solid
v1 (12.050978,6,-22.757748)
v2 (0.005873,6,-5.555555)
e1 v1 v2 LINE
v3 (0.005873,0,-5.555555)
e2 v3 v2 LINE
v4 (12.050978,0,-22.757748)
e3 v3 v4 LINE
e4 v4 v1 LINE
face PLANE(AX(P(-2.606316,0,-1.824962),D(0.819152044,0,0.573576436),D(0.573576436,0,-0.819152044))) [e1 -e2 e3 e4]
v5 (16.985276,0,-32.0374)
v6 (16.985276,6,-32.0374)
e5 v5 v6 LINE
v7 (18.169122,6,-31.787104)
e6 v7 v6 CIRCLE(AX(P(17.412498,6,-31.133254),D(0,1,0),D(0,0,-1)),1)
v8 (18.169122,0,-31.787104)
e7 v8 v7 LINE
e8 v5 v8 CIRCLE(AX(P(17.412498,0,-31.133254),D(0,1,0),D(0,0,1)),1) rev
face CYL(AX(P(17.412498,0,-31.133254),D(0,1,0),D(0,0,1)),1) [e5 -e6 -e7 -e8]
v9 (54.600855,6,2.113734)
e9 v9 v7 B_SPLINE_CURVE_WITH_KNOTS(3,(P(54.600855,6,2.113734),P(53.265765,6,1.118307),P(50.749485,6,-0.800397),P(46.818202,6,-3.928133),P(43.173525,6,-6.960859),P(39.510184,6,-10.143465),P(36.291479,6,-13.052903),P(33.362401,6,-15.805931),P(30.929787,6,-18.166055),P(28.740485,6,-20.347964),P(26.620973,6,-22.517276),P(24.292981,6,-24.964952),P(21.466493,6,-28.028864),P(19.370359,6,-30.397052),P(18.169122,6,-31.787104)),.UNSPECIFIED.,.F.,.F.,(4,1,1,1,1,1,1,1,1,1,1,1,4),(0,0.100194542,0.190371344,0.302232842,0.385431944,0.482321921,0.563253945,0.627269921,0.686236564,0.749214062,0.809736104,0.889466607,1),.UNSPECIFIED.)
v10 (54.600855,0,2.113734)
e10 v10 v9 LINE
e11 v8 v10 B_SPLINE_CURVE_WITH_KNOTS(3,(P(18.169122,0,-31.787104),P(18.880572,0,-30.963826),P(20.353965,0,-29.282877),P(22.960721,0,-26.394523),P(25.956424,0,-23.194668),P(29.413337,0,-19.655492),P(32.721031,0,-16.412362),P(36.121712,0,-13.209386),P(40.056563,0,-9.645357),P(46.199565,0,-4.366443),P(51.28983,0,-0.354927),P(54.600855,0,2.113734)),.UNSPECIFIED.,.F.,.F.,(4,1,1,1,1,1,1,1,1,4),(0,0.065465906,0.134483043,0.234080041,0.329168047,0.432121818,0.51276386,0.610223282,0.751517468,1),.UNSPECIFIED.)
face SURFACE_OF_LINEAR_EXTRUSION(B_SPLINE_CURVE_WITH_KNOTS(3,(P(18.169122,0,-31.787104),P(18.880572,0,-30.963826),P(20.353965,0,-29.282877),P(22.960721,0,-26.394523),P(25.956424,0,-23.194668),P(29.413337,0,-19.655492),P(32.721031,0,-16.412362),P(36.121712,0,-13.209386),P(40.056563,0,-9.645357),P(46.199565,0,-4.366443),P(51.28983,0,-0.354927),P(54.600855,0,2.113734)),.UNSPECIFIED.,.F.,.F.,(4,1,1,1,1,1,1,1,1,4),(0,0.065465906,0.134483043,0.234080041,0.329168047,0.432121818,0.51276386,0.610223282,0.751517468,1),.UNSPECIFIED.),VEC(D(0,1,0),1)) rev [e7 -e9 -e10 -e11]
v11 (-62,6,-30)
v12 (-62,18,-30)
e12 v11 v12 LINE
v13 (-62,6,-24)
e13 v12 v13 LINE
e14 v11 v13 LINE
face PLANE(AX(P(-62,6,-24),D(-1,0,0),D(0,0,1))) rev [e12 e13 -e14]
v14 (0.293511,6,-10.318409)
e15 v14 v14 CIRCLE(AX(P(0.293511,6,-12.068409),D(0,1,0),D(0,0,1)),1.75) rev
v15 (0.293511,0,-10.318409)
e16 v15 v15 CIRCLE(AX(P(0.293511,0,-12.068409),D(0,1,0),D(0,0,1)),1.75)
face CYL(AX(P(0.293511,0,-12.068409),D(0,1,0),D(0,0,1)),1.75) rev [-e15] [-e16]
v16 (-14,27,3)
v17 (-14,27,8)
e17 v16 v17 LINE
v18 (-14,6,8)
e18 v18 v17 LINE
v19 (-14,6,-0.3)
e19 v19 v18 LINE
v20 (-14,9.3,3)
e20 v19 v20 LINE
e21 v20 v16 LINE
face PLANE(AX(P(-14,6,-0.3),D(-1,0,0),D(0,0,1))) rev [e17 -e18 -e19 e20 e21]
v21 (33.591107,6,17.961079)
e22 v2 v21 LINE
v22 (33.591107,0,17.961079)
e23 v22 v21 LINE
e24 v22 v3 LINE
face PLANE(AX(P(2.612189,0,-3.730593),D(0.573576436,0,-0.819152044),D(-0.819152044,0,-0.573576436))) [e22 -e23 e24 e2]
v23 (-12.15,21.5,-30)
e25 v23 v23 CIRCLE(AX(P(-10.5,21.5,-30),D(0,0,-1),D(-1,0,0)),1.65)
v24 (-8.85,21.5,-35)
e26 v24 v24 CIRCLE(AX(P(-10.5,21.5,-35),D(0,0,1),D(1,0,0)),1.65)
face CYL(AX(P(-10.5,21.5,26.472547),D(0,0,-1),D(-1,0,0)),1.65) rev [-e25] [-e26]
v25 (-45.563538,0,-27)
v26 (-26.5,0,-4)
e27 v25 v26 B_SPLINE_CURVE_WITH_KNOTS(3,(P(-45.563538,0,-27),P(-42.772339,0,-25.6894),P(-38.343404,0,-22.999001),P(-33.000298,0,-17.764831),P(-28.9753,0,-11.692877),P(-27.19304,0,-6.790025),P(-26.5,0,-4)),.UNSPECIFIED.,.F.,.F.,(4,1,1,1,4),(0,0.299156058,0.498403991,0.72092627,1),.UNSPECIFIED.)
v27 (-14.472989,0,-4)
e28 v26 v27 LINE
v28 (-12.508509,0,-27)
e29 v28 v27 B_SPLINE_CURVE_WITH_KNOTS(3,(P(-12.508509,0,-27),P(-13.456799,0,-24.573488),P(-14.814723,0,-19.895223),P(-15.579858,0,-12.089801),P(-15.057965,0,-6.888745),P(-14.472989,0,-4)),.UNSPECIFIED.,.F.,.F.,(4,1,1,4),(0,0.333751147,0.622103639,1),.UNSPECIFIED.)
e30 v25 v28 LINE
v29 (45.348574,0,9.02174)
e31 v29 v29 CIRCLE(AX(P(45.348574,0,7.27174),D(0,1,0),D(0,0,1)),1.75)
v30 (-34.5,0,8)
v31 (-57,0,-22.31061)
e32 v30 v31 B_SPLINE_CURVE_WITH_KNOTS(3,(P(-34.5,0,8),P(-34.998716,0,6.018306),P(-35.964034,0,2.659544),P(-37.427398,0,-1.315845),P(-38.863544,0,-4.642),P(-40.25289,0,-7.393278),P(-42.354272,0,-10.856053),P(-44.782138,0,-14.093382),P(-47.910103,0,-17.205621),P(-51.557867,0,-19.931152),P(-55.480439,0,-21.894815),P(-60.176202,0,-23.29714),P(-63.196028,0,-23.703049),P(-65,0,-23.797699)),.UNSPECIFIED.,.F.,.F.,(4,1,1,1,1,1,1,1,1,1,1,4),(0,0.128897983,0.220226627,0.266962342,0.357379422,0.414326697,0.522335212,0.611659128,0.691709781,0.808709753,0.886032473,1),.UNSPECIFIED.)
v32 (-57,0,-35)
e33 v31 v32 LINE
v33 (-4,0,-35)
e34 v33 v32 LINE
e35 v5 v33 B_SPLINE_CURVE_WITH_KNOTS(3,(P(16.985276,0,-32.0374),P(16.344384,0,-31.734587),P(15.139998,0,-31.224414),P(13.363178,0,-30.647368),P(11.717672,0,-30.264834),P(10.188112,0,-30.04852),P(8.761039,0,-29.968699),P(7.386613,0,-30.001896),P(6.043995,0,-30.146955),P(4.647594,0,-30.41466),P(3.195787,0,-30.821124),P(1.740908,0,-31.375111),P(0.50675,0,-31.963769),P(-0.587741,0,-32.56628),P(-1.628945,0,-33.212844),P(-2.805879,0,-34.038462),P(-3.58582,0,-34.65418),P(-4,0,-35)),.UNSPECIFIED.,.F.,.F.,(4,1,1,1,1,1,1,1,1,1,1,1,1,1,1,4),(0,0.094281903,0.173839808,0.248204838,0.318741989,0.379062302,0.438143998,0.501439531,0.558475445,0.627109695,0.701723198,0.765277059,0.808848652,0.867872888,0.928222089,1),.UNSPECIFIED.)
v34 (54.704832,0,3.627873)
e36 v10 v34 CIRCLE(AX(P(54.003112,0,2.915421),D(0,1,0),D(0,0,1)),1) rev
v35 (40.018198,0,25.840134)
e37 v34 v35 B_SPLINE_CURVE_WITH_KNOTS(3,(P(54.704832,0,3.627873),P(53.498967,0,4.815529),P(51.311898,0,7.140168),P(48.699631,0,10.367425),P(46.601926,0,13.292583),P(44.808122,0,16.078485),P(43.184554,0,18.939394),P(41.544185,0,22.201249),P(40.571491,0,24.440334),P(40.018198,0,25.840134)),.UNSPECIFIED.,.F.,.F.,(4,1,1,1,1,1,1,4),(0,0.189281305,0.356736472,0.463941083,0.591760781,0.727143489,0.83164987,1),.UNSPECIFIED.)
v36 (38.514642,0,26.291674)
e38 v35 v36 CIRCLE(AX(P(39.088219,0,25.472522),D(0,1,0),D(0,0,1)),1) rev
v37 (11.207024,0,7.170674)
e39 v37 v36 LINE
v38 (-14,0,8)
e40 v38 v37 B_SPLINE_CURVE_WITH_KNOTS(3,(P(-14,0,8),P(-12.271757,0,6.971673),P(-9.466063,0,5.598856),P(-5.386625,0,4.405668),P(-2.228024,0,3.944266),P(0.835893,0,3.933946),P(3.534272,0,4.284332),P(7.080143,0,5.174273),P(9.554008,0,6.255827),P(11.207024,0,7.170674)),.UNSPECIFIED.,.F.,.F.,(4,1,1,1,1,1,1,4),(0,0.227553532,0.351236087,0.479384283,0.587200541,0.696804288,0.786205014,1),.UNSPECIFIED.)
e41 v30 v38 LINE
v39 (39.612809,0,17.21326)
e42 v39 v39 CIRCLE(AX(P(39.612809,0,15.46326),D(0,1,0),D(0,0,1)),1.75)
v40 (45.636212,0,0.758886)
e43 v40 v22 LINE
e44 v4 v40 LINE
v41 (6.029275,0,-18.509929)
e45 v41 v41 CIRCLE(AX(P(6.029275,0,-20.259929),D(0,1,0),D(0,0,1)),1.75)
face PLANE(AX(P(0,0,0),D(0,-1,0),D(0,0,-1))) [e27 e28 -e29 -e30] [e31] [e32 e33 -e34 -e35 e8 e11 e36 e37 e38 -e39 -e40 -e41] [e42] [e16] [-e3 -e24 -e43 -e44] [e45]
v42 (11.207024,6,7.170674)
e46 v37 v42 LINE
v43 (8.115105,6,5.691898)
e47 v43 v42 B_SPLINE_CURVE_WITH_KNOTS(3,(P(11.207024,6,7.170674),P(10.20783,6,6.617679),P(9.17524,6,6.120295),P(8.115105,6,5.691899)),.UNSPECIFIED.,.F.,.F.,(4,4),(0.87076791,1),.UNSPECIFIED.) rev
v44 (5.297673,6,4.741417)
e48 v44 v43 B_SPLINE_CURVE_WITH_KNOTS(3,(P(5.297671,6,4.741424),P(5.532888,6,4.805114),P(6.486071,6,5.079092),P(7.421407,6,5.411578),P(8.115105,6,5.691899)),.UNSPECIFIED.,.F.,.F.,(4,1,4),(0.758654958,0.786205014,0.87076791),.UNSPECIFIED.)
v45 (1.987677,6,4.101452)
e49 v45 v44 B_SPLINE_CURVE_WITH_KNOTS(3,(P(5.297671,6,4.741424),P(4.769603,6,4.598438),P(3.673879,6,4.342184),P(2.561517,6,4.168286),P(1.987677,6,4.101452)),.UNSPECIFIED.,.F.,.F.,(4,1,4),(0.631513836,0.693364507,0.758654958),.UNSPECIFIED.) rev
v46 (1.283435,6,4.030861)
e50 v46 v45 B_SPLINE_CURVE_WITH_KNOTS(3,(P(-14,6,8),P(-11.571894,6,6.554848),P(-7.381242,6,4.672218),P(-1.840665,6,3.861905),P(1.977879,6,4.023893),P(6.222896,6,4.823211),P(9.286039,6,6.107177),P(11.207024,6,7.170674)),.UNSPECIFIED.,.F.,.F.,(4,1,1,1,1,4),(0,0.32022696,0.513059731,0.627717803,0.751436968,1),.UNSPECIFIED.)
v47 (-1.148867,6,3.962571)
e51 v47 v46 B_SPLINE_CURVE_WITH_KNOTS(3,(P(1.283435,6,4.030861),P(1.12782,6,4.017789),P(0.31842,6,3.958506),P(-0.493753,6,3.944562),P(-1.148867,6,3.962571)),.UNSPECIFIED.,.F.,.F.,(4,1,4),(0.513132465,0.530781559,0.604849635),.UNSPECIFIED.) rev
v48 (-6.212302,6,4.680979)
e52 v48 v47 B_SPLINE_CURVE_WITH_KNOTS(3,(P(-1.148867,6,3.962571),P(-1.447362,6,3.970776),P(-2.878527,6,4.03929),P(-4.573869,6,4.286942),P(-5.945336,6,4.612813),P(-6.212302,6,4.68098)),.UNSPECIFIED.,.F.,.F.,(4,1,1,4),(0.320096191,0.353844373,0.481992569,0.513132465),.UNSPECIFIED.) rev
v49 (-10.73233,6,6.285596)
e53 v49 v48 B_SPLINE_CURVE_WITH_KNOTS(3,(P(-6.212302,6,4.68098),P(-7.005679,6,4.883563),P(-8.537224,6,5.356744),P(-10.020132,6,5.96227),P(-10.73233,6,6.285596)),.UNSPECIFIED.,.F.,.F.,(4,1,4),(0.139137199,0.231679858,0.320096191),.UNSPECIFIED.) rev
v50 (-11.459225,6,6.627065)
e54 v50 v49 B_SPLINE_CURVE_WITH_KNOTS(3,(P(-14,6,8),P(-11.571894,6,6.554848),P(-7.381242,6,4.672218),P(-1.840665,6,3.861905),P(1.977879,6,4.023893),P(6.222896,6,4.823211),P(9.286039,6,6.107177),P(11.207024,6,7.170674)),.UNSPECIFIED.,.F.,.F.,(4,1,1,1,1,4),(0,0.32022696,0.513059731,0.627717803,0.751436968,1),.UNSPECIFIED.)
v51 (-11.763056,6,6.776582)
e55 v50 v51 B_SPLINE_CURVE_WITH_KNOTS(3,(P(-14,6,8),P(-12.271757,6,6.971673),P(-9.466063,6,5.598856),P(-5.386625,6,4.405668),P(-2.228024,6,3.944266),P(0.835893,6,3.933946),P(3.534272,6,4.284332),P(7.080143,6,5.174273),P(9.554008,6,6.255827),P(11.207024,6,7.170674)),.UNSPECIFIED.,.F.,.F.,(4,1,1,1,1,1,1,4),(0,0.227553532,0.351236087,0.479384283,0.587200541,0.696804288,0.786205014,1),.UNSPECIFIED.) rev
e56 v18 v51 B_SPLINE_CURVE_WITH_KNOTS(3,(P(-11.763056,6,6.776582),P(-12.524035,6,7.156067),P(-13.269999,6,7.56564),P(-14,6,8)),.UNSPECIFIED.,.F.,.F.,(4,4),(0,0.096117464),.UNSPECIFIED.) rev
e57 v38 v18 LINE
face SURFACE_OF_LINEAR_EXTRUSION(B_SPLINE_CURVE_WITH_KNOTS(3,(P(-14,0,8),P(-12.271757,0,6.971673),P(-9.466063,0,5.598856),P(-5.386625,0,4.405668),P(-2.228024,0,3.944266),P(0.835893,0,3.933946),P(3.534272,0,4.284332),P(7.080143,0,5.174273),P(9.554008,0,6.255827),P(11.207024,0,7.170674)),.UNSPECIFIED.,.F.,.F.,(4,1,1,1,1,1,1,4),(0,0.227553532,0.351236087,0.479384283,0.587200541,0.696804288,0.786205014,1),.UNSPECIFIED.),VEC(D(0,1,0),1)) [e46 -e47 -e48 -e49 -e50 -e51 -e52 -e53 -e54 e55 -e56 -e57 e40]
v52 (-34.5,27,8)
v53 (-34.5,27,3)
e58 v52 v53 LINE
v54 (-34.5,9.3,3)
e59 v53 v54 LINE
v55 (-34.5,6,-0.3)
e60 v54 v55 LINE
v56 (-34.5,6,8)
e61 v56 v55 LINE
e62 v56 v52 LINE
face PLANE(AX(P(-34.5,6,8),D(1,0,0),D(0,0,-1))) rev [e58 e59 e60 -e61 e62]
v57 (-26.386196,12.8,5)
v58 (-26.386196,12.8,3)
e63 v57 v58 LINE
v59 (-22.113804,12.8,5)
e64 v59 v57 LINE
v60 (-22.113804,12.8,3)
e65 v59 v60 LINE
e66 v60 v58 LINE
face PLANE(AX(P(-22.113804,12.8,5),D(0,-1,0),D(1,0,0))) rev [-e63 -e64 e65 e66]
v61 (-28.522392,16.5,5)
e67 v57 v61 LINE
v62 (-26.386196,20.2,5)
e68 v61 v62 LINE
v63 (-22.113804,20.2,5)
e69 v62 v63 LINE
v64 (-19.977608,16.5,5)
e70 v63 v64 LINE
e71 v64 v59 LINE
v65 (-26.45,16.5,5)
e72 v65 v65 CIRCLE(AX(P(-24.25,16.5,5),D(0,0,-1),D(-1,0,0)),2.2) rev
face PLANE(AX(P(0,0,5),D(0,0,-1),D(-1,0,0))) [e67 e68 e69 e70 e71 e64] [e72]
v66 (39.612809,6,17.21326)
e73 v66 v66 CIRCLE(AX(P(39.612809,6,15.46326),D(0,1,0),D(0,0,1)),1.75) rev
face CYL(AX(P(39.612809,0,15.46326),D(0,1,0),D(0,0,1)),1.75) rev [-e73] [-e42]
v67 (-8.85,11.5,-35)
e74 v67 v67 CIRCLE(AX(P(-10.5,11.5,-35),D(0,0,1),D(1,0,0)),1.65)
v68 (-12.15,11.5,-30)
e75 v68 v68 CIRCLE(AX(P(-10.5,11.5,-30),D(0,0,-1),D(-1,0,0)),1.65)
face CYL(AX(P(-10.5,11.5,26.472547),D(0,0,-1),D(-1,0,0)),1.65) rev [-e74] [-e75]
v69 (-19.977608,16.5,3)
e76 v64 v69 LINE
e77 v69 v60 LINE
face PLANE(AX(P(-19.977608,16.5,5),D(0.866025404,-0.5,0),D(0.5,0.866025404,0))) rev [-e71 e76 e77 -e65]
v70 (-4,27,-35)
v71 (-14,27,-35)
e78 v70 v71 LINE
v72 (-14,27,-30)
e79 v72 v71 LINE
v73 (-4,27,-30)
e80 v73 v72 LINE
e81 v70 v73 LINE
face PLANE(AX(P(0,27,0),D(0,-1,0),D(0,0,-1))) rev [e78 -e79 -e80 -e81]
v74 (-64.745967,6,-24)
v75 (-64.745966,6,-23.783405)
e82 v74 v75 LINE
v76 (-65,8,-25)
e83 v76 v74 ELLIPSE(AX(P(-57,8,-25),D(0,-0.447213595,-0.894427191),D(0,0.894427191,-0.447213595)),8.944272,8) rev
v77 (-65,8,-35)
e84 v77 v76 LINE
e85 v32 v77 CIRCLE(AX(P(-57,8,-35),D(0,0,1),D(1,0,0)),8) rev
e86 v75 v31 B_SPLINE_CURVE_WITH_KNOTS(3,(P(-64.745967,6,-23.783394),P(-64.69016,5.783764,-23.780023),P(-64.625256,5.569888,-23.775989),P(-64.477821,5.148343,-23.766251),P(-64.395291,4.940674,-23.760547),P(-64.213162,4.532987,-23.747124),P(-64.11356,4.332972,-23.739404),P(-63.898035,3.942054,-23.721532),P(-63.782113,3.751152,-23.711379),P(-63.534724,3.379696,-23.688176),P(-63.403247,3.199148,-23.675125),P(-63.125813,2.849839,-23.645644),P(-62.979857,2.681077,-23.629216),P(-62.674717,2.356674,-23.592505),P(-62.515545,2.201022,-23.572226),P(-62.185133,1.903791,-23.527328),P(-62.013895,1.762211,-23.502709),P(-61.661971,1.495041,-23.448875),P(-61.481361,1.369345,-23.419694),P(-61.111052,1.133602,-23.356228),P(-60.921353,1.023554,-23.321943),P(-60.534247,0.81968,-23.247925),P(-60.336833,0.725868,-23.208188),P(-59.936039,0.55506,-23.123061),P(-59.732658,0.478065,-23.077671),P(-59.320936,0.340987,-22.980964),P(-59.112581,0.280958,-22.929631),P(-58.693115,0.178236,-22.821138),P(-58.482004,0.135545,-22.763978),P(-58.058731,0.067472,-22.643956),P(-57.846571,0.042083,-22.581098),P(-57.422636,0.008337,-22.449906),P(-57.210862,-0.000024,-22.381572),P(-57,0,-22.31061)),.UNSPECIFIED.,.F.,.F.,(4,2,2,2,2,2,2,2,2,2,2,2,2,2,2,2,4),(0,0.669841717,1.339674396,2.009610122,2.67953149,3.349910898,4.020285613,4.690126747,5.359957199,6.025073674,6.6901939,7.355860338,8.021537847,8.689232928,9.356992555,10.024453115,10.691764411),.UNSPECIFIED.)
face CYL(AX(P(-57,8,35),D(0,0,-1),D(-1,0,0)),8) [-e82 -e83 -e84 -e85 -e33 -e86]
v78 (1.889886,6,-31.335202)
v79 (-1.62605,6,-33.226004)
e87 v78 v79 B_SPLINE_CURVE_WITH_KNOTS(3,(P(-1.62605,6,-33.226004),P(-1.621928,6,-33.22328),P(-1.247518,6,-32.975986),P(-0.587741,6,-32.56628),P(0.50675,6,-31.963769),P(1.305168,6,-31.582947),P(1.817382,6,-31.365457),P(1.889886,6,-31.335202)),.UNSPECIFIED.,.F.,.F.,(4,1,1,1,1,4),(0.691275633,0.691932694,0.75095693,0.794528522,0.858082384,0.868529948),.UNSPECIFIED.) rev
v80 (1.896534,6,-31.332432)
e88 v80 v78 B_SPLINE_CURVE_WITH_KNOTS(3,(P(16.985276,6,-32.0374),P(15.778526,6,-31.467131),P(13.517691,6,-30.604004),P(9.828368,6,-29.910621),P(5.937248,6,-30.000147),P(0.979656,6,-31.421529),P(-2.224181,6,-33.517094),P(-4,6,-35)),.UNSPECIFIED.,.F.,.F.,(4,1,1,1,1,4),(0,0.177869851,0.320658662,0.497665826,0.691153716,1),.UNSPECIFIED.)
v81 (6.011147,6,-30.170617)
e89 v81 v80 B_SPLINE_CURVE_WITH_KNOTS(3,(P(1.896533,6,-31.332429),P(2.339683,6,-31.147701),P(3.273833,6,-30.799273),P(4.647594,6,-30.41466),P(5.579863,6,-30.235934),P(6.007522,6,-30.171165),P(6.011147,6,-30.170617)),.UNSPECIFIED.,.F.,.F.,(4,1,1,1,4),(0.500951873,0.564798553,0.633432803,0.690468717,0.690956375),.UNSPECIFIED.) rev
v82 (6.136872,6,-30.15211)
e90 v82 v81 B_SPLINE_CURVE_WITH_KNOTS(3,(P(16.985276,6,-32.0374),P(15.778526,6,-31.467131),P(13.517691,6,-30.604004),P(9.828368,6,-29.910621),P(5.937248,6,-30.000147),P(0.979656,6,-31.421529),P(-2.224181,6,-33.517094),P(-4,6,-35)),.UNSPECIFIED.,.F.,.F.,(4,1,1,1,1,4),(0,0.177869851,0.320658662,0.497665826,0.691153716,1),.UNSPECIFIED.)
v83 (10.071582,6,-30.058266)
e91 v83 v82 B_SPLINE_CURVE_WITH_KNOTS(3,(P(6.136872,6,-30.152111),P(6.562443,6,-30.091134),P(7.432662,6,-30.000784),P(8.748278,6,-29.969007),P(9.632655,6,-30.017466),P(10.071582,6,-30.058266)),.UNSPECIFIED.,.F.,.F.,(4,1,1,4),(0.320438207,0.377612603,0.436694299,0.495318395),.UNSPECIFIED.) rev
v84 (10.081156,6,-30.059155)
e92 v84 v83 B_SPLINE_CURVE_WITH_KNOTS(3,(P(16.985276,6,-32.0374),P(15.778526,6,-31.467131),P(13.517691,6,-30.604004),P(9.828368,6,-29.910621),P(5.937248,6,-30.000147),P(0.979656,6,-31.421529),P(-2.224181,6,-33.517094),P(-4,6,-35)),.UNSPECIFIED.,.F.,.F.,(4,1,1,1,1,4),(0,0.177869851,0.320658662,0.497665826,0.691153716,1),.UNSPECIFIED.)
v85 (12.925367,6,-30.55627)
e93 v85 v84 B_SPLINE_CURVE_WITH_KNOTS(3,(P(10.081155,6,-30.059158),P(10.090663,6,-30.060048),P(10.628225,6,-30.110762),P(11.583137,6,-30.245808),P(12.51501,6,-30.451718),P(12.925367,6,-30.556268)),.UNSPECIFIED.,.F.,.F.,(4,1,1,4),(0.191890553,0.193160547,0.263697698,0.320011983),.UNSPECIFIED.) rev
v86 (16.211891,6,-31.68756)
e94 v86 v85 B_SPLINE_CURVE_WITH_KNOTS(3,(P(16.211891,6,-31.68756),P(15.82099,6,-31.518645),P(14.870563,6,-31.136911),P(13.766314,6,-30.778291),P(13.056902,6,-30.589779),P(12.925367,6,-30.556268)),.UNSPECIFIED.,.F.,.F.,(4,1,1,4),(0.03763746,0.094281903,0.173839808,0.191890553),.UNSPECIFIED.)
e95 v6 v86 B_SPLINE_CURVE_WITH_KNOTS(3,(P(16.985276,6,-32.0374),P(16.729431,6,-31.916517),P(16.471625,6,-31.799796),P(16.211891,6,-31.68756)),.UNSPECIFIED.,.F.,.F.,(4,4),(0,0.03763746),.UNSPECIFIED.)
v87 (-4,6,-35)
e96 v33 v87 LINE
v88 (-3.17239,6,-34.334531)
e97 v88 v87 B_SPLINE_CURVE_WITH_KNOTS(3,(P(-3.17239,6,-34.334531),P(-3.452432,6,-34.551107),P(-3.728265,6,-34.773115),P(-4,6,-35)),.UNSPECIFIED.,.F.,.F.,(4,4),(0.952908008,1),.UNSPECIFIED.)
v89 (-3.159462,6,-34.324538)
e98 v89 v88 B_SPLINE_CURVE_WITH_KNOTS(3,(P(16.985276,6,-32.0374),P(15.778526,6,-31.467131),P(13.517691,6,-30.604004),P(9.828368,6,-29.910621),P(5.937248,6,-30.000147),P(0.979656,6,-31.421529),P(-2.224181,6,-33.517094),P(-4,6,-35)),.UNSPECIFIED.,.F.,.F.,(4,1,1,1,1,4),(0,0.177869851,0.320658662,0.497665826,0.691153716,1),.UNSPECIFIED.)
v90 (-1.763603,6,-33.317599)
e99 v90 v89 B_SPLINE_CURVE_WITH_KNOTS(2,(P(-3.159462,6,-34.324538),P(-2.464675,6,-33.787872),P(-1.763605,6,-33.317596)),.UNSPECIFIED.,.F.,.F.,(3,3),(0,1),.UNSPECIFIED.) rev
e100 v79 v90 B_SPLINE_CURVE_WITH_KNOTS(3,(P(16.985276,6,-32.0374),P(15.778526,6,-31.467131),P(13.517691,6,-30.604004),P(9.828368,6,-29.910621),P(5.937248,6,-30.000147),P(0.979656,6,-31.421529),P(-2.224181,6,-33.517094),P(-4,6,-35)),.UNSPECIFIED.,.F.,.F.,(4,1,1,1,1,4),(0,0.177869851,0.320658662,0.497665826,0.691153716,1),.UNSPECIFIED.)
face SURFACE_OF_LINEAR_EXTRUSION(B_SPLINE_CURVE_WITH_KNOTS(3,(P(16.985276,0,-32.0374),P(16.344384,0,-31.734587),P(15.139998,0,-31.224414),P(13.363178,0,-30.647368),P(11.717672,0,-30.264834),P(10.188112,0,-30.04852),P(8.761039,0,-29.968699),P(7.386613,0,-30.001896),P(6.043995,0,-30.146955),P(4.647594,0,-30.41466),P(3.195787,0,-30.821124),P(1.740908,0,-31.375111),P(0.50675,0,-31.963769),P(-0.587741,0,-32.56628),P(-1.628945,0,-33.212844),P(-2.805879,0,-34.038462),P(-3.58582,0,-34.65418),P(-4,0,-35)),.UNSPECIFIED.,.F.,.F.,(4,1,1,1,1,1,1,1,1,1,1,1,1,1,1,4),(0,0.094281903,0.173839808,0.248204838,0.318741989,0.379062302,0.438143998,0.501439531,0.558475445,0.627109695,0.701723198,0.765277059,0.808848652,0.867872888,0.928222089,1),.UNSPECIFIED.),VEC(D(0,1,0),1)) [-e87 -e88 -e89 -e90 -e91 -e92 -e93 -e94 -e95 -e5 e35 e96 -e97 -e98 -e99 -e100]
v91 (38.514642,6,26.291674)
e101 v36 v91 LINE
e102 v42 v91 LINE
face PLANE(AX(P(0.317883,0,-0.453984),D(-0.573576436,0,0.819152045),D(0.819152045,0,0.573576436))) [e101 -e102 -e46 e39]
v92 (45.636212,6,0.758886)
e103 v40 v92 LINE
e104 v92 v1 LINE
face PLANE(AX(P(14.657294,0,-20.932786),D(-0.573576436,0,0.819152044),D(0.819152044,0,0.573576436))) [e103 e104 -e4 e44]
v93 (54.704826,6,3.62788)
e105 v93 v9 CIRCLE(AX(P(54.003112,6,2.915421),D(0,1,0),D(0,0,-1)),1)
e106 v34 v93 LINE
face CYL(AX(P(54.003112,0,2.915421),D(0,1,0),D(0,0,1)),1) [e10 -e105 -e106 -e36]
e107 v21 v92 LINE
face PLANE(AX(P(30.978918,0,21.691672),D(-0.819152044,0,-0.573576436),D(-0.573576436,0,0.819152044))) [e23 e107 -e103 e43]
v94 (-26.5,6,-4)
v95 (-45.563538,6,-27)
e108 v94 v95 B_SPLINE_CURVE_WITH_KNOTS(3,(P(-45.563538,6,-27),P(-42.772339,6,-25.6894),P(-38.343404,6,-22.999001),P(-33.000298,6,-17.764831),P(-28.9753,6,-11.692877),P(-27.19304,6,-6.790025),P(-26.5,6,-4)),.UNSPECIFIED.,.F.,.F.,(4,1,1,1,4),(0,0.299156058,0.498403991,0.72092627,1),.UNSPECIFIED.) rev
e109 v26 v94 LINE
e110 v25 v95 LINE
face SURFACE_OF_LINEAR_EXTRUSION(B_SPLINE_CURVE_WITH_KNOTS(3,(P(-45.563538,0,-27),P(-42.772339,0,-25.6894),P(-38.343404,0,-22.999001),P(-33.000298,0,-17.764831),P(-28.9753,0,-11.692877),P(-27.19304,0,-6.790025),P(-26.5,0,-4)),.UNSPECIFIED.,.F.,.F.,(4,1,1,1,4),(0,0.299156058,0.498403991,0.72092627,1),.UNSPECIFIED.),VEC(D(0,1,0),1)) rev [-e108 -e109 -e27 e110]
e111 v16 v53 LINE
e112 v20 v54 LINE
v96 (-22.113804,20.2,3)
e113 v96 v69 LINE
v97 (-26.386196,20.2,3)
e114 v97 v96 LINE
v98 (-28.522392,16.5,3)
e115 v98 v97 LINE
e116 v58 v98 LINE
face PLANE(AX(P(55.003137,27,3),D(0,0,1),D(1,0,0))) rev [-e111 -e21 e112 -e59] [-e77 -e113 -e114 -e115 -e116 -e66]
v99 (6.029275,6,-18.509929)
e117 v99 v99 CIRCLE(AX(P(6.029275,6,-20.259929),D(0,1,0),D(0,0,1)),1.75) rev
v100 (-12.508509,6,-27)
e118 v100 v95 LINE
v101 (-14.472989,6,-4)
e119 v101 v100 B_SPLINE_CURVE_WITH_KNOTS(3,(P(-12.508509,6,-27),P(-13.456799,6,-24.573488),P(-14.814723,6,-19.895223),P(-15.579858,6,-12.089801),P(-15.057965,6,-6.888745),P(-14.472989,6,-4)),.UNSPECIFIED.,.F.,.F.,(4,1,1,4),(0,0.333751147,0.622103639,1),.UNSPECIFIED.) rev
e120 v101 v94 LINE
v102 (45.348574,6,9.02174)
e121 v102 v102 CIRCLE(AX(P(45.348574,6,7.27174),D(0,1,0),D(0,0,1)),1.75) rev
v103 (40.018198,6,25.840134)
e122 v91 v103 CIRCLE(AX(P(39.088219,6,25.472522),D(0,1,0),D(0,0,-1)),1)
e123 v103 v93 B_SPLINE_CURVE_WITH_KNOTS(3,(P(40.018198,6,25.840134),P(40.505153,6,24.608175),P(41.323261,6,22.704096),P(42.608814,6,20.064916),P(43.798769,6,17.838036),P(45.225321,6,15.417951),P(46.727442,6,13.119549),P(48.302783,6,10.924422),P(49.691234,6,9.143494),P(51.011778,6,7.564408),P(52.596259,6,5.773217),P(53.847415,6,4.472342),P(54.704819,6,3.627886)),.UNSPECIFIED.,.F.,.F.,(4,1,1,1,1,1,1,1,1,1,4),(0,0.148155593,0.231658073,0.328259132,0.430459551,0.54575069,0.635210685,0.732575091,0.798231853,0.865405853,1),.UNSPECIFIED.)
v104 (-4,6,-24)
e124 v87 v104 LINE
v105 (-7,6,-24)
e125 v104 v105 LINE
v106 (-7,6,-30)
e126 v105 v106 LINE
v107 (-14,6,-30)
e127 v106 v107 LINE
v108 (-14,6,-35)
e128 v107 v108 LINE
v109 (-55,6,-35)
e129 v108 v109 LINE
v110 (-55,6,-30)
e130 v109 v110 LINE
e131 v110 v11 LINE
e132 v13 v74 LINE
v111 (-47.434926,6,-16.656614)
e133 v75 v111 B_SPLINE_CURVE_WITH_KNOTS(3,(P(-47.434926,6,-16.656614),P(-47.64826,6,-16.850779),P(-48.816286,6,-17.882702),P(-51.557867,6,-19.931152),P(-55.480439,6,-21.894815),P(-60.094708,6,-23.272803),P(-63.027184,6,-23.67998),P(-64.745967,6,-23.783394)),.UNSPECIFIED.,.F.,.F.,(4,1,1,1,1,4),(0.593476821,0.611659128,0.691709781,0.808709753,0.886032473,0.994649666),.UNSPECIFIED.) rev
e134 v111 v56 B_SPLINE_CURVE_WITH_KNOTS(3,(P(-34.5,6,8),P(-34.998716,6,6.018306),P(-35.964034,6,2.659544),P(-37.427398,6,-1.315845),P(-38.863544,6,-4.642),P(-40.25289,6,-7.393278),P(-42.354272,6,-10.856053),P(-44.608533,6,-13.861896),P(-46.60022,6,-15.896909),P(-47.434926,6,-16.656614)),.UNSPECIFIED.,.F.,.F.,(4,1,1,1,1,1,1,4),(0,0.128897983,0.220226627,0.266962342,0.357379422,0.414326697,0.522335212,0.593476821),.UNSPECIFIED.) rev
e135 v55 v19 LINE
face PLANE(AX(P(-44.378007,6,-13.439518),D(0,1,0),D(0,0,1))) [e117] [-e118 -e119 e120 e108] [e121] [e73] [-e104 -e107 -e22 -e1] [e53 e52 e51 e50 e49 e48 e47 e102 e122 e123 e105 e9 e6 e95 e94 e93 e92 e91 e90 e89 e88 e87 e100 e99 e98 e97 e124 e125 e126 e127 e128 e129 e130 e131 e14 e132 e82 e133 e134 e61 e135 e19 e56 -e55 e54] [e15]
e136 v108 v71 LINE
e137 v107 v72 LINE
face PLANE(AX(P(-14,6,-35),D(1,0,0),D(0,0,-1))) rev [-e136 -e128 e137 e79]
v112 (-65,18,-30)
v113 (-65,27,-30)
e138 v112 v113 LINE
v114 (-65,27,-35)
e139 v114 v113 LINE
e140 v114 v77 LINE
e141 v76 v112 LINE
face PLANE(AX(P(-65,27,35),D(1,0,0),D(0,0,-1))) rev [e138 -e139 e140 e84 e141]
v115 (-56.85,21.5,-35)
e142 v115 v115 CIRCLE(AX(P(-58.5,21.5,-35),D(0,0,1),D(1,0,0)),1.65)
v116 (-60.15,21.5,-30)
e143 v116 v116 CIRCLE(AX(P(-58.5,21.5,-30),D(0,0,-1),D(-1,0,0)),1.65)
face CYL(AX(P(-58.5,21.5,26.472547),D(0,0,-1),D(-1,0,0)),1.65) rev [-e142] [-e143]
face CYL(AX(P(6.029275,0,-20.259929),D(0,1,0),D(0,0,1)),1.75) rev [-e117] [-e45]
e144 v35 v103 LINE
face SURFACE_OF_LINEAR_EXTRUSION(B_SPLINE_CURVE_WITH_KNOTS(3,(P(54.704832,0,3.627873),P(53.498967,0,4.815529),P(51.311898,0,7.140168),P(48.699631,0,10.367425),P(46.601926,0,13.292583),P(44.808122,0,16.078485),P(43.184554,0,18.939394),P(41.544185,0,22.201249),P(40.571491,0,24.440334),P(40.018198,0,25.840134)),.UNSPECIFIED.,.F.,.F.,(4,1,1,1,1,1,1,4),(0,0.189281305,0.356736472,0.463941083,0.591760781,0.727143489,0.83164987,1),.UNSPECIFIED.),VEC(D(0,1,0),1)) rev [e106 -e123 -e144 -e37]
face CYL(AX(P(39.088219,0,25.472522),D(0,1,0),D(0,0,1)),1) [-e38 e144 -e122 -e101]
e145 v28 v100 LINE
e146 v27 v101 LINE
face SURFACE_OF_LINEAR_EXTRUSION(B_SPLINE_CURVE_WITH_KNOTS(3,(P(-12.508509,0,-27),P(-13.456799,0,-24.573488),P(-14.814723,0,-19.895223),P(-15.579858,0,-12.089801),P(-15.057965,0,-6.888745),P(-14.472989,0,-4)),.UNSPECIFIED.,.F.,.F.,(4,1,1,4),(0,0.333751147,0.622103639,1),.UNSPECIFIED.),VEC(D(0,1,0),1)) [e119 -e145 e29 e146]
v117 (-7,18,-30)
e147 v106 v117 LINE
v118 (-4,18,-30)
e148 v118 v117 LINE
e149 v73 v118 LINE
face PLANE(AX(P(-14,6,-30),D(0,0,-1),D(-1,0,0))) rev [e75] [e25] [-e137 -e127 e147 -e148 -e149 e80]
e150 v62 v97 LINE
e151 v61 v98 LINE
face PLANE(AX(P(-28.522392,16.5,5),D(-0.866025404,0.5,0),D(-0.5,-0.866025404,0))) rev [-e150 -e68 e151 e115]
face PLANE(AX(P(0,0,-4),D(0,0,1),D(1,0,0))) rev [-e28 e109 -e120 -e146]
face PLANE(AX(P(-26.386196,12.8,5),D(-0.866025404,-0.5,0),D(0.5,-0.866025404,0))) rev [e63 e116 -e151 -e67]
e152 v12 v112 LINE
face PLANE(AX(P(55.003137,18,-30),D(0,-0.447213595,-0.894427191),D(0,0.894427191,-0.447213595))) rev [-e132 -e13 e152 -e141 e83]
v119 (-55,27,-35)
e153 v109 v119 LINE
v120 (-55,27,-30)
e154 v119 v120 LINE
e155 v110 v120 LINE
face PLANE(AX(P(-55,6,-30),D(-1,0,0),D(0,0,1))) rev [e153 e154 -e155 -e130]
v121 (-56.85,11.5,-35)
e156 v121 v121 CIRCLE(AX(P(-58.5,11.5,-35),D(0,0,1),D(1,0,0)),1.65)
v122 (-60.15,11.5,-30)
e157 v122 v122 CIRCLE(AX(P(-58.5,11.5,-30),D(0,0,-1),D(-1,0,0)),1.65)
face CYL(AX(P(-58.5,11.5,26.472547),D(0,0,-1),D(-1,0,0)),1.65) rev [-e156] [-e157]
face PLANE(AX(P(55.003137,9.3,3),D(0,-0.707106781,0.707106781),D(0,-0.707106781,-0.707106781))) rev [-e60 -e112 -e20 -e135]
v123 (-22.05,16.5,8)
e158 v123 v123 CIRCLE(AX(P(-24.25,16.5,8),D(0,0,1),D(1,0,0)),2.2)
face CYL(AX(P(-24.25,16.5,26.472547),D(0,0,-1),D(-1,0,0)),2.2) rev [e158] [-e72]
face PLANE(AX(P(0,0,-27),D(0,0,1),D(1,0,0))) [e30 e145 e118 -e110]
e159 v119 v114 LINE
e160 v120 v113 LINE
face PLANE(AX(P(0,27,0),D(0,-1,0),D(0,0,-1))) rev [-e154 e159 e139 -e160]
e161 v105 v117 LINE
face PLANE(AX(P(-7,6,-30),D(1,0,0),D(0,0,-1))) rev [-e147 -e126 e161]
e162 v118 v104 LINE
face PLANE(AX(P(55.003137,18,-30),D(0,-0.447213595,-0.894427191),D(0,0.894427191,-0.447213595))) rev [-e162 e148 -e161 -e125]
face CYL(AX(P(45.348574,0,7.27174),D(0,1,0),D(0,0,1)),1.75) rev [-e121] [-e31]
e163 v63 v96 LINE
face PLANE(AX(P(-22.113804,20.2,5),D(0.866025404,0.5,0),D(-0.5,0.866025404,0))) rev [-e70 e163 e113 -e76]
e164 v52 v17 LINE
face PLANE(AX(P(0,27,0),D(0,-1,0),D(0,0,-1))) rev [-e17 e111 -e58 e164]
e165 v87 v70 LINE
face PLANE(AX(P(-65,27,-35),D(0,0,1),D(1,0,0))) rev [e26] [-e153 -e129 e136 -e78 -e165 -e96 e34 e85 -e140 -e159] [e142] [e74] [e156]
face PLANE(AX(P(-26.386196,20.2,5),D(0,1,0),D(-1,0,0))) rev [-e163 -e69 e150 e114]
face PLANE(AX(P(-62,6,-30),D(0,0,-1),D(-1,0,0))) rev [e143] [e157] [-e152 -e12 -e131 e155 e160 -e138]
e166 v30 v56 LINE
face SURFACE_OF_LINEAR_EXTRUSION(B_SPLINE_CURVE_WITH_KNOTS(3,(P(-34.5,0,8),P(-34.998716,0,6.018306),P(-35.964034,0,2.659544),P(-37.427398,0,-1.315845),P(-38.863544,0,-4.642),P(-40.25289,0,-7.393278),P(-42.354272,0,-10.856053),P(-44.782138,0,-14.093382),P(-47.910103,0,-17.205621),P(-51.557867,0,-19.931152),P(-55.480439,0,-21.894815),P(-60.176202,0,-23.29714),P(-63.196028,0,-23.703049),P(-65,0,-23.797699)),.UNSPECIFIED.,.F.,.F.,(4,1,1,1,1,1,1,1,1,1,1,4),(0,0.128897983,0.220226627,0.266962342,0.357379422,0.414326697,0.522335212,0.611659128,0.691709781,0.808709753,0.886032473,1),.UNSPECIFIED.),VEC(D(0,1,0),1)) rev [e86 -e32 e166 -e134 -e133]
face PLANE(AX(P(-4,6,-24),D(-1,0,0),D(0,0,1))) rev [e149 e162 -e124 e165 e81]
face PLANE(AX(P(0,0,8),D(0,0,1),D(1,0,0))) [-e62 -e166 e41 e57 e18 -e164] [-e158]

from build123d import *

# Parameters (mm, degrees)
SKETCH1_W               = 130
SKETCH1_H               = 70
BOSS_EXTRUDE1_DEPTH     = 27
SKETCH2_R               = 1.75
CUT_EXTRUDE1_DEPTH      = 27
CUT_EXTRUDE2_START      = -21
CUT_EXTRUDE2_OUTLINE_R  = 1.75
CUT_EXTRUDE2_DEPTH      = 21
CUT_EXTRUDE3_DEPTH      = 100.823879977
CUT_EXTRUDE3_DEPTH_BACK = 100.823879977
CUT_EXTRUDE4_DEPTH      = 80.987499152
CUT_EXTRUDE4_DEPTH_BACK = 80.987499152
SKETCH5_R               = 1.65
SKETCH5_R_2             = 2.2
CUT_EXTRUDE5_DEPTH      = 2
FILLET2_R               = 8


# Read off the part's stored shape, not the designer's step: Cut-Extrude2
with BuildPart() as part:
    # Sketch1 → Boss-Extrude1 (new body)
    with BuildSketch(Plane(origin=(0, 0, 0), x_dir=(1, 0, 0), z_dir=(0, 1, 0))):
        Rectangle(SKETCH1_W, SKETCH1_H)
    extrude(amount=BOSS_EXTRUDE1_DEPTH)

    # Sketch2 → Cut-Extrude1 (cut)
    with BuildSketch(Plane(origin=(0, 27, 0), x_dir=(1, 0, 0), z_dir=(0, 1, 0))):
        with BuildLine():
            Line((65, 35), (-4, 35))
            add(Edge.make_bspline(
                [(16.985276193, 32.037400285), (16.344384253, 31.734586923), (15.139997676, 31.224413868), (13.363177927, 30.647367552), (11.717672063, 30.264833972), (10.188111987, 30.048519757), (8.761038737, 29.968698707), (7.386612758, 30.001896041), (6.043994999, 30.146954639), (4.647593927, 30.414660082), (3.19578664, 30.821123925), (1.740907748, 31.375111265), (0.506749671, 31.963769434), (-0.587741435, 32.566280044), (-1.628944852, 33.212844151), (-2.805878859, 34.038462463), (-3.58582038, 34.654179882), (-4, 35)],
                knots=[0, 0, 0, 0, 0.094281903, 0.173839808, 0.248204838, 0.318741989, 0.379062302, 0.438143998, 0.501439531, 0.558475445, 0.627109695, 0.701723198, 0.765277059, 0.808848652, 0.867872888, 0.928222089, 1, 1, 1, 1], degree=3))
            ThreePointArc((16.985276193, 32.037400285), (17.619352011, 32.111625453), (18.169122212, 31.787103892))
            add(Edge.make_bspline(
                [(18.169122212, 31.787103892), (18.880572219, 30.963826417), (20.353964659, 29.282877442), (22.960721292, 26.394523325), (25.956424204, 23.194668161), (29.413337423, 19.655492092), (32.721030959, 16.412362495), (36.121712054, 13.209386341), (40.056563488, 9.645356576), (46.199565364, 4.366442592), (51.289830213, 0.354927225), (54.600855171, -2.113733504)],
                knots=[0, 0, 0, 0, 0.065465906, 0.134483043, 0.234080041, 0.329168047, 0.432121818, 0.51276386, 0.610223282, 0.751517468, 1, 1, 1, 1], degree=3))
            ThreePointArc((54.600855171, -2.113733504), (55.000762083, -2.84691143), (54.704832326, -3.627873009))
            add(Edge.make_bspline(
                [(54.704832326, -3.627873009), (53.498966947, -4.81552915), (51.311897548, -7.140167952), (48.69963123, -10.367424816), (46.601925875, -13.292582874), (44.80812232, -16.078484523), (43.184554029, -18.939393608), (41.54418466, -22.201248931), (40.571491097, -24.44033411), (40.018197727, -25.840134095)],
                knots=[0, 0, 0, 0, 0.189281305, 0.356736472, 0.463941083, 0.591760781, 0.727143489, 0.83164987, 1, 1, 1, 1], degree=3))
            ThreePointArc((40.018197727, -25.840134095), (39.375842934, -26.43026519), (38.514642112, -26.291673943))
            Line((38.514642112, -26.291673943), (11.207024421, -7.170674209))
            add(Edge.make_bspline(
                [(-14, -8), (-12.271757293, -6.971672517), (-9.466063488, -5.598856445), (-5.386625364, -4.405667761), (-2.228024111, -3.944265665), (0.835893041, -3.933946272), (3.534272193, -4.284331997), (7.080143183, -5.174272804), (9.554008371, -6.255827229), (11.207024421, -7.170674209)],
                knots=[0, 0, 0, 0, 0.227553532, 0.351236087, 0.479384283, 0.587200541, 0.696804288, 0.786205014, 1, 1, 1, 1], degree=3))
            Line((-14, -8), (-34.5, -8))
            add(Edge.make_bspline(
                [(-34.5, -8), (-34.998716381, -6.018305789), (-35.964034069, -2.659544028), (-37.427398174, 1.315845087), (-38.863544091, 4.641999873), (-40.252890439, 7.393277622), (-42.354272337, 10.856052977), (-44.782138282, 14.09338159), (-47.910103128, 17.205621078), (-51.557866637, 19.931151613), (-55.480439434, 21.894814973), (-60.176202103, 23.297139891), (-63.196027982, 23.703049389), (-65, 23.797699279)],
                knots=[0, 0, 0, 0, 0.128897983, 0.220226627, 0.266962342, 0.357379422, 0.414326697, 0.522335212, 0.611659128, 0.691709781, 0.808709753, 0.886032473, 1, 1, 1, 1], degree=3))
            Line((-65, 23.797699279), (-65, -35))
            Line((-65, -35), (65, -35))
            Line((65, -35), (65, 35))
        make_face()
        Polygon((33.591106657, -17.961078948), (0.005872841, 5.555554943), (12.050978004, 22.757747873), (45.63621182, -0.758886018), align=None)
        with BuildLine():
            add(Edge.make_bspline(
                [(-12.50850871, 27), (-13.456798873, 24.573487755), (-14.814722597, 19.89522318), (-15.579858129, 12.089800552), (-15.057965095, 6.888745359), (-14.472989206, 4)],
                knots=[0, 0, 0, 0, 0.333751147, 0.622103639, 1, 1, 1, 1], degree=3))
            Line((-14.472989206, 4), (-26.5, 4))
            add(Edge.make_bspline(
                [(-45.563538233, 27), (-42.772339428, 25.689399679), (-38.343403879, 22.999001318), (-33.000298141, 17.764831394), (-28.975299715, 11.692876511), (-27.193040414, 6.790024988), (-26.5, 4)],
                knots=[0, 0, 0, 0, 0.299156058, 0.498403991, 0.72092627, 1, 1, 1, 1], degree=3))
            Line((-45.563538233, 27), (-12.50850871, 27))
        make_face()
        with Locations(Location((0.293511086, 12.068408714, 0), (0, 0, 270))):
            Circle(SKETCH2_R)
        with Locations(Location((6.029275449, 20.259929156, 0), (0, 0, 270))):
            Circle(SKETCH2_R)
        with Locations(Location((45.348573575, -7.271739788, 0), (0, 0, 270))):
            Circle(SKETCH2_R)
        with Locations(Location((39.612809212, -15.463260231, 0), (0, 0, 270))):
            Circle(SKETCH2_R)
    extrude(amount=-CUT_EXTRUDE1_DEPTH, mode=Mode.SUBTRACT)

    # Cut-Extrude2 outline → Cut-Extrude2 (cut)
    with BuildSketch(Plane(origin=(0, 27, 0), x_dir=(1, 0, 0), z_dir=(0, 1, 0)).offset(CUT_EXTRUDE2_START)):
        with BuildLine():
            add(Edge.make_bspline(
                [(-34.5, -8), (-34.998716381, -6.018305789), (-35.964034069, -2.659544028), (-37.427398174, 1.315845087), (-38.863544091, 4.641999873), (-40.252890439, 7.393277622), (-42.354272337, 10.856052977), (-44.782138282, 14.09338159), (-47.910103128, 17.205621078), (-51.557866637, 19.931151613), (-55.480439434, 21.894814973), (-60.176202103, 23.297139891), (-63.196027982, 23.703049389), (-65, 23.797699279)],
                knots=[0, 0, 0, 0, 0.128897983, 0.220226627, 0.266962342, 0.357379422, 0.414326697, 0.522335212, 0.611659128, 0.691709781, 0.808709753, 0.886032473, 1, 1, 1, 1], degree=3))
            Line((-34.5, -8), (-34.5, 0.3))
            Line((-34.5, 0.3), (-14, 0.3))
            Line((-14, 0.3), (-14, -8))
            add(Edge.make_bspline(
                [(-14, -8), (-12.271757293, -6.971672517), (-9.466063488, -5.598856445), (-5.386625364, -4.405667761), (-2.228024111, -3.944265665), (0.835893041, -3.933946272), (3.534272193, -4.284331997), (7.080143183, -5.174272804), (9.554008371, -6.255827229), (11.207024421, -7.170674209)],
                knots=[0, 0, 0, 0, 0.227553532, 0.351236087, 0.479384283, 0.587200541, 0.696804288, 0.786205014, 1, 1, 1, 1], degree=3))
            Line((11.207024421, -7.170674209), (38.514642112, -26.291673943))
            ThreePointArc((38.514642112, -26.291673943), (39.375842934, -26.43026519), (40.018197727, -25.840134095))
            add(Edge.make_bspline(
                [(54.704832326, -3.627873009), (53.498966947, -4.81552915), (51.311897548, -7.140167952), (48.69963123, -10.367424816), (46.601925875, -13.292582874), (44.80812232, -16.078484523), (43.184554029, -18.939393608), (41.54418466, -22.201248931), (40.571491097, -24.44033411), (40.018197727, -25.840134095)],
                knots=[0, 0, 0, 0, 0.189281305, 0.356736472, 0.463941083, 0.591760781, 0.727143489, 0.83164987, 1, 1, 1, 1], degree=3))
            ThreePointArc((54.704832326, -3.627873009), (55.000762083, -2.84691143), (54.600855171, -2.113733504))
            add(Edge.make_bspline(
                [(18.169122212, 31.787103892), (18.880572219, 30.963826417), (20.353964659, 29.282877442), (22.960721292, 26.394523325), (25.956424204, 23.194668161), (29.413337423, 19.655492092), (32.721030959, 16.412362495), (36.121712054, 13.209386341), (40.056563488, 9.645356576), (46.199565364, 4.366442592), (51.289830213, 0.354927225), (54.600855171, -2.113733504)],
                knots=[0, 0, 0, 0, 0.065465906, 0.134483043, 0.234080041, 0.329168047, 0.432121818, 0.51276386, 0.610223282, 0.751517468, 1, 1, 1, 1], degree=3))
            ThreePointArc((18.169122212, 31.787103892), (17.619352011, 32.111625453), (16.985276193, 32.037400285))
            add(Edge.make_bspline(
                [(16.985276193, 32.037400285), (16.344384253, 31.734586923), (15.139997676, 31.224413868), (13.363177927, 30.647367552), (11.717672063, 30.264833972), (10.188111987, 30.048519757), (8.761038737, 29.968698707), (7.386612758, 30.001896041), (6.043994999, 30.146954639), (4.647593927, 30.414660082), (3.19578664, 30.821123925), (1.740907748, 31.375111265), (0.506749671, 31.963769434), (-0.587741435, 32.566280044), (-1.628944852, 33.212844151), (-2.805878859, 34.038462463), (-3.58582038, 34.654179882), (-4, 35)],
                knots=[0, 0, 0, 0, 0.094281903, 0.173839808, 0.248204838, 0.318741989, 0.379062302, 0.438143998, 0.501439531, 0.558475445, 0.627109695, 0.701723198, 0.765277059, 0.808848652, 0.867872888, 0.928222089, 1, 1, 1, 1], degree=3))
            Line((-4, 35), (-4, 24))
            Line((-4, 24), (-7, 24))
            Line((-7, 24), (-7, 30))
            Line((-7, 30), (-14, 30))
            Line((-14, 30), (-14, 35))
            Line((-14, 35), (-55, 35))
            Line((-55, 35), (-55, 30))
            Line((-55, 30), (-62, 30))
            Line((-62, 30), (-62, 24))
            Line((-62, 24), (-65, 24))
            Line((-65, 24), (-65, 23.797699279))
        make_face()
        with Locations((39.612809212, -15.463260231)):
            Circle(CUT_EXTRUDE2_OUTLINE_R, mode=Mode.SUBTRACT)
        Polygon((45.63621182, -0.758886018), (33.591106657, -17.961078948), (0.005872841, 5.555554943), (12.050978004, 22.757747873), align=None, mode=Mode.SUBTRACT)
        with Locations((45.348573575, -7.271739788)):
            Circle(CUT_EXTRUDE2_OUTLINE_R, mode=Mode.SUBTRACT)
        with BuildLine():
            Line((-45.563538233, 27), (-12.50850871, 27))
            add(Edge.make_bspline(
                [(-12.50850871, 27), (-13.456798873, 24.573487755), (-14.814722597, 19.89522318), (-15.579858129, 12.089800552), (-15.057965095, 6.888745359), (-14.472989206, 4)],
                knots=[0, 0, 0, 0, 0.333751147, 0.622103639, 1, 1, 1, 1], degree=3))
            Line((-14.472989206, 4), (-26.5, 4))
            add(Edge.make_bspline(
                [(-45.563538233, 27), (-42.772339428, 25.689399679), (-38.343403879, 22.999001318), (-33.000298141, 17.764831394), (-28.975299715, 11.692876511), (-27.193040414, 6.790024988), (-26.5, 4)],
                knots=[0, 0, 0, 0, 0.299156058, 0.498403991, 0.72092627, 1, 1, 1, 1], degree=3))
        make_face(mode=Mode.SUBTRACT)
        with Locations((0.293511086, 12.068408714)):
            Circle(CUT_EXTRUDE2_OUTLINE_R, mode=Mode.SUBTRACT)
        with Locations((6.029275449, 20.259929156)):
            Circle(CUT_EXTRUDE2_OUTLINE_R, mode=Mode.SUBTRACT)
    extrude(amount=CUT_EXTRUDE2_DEPTH, mode=Mode.SUBTRACT)

    # Sketch4 → Cut-Extrude3 (cut, two sides: drawn at the far end of the back side and taken through both)
    with BuildSketch(Plane.ZY.offset(34.5).offset(-CUT_EXTRUDE3_DEPTH_BACK)):
        Polygon((-0.3, 27), (3, 27), (3, 9.3), (-0.3, 6), align=None)
        Polygon((-24, 27), (-30, 27), (-30, 18), (-24, 6), align=None)
    extrude(amount=CUT_EXTRUDE3_DEPTH + CUT_EXTRUDE3_DEPTH_BACK, mode=Mode.SUBTRACT)

    # Sketch5 → Cut-Extrude4 (cut, two sides: drawn at the far end of the back side and taken through both)
    with BuildSketch(Plane(origin=(0, 0, 3), x_dir=(-1, 0, 0), z_dir=(0, 0, -1)).offset(-CUT_EXTRUDE4_DEPTH_BACK)):
        with Locations((10.5, 21.5)):
            Circle(SKETCH5_R)
        with Locations((10.5, 11.5)):
            Circle(SKETCH5_R)
        with Locations((58.5, 21.5)):
            Circle(SKETCH5_R)
        with Locations((58.5, 11.5)):
            Circle(SKETCH5_R)
        with Locations(Location((24.25, 16.5, 0), (0, 0, 180))):
            Circle(SKETCH5_R_2)
    extrude(amount=CUT_EXTRUDE4_DEPTH + CUT_EXTRUDE4_DEPTH_BACK, mode=Mode.SUBTRACT)

    # Sketch6 → Cut-Extrude5 (cut)
    with BuildSketch(Plane(origin=(0, 0, 3), x_dir=(-1, 0, 0), z_dir=(0, 0, -1))):
        Polygon((26.386195996, 20.2), (22.113804004, 20.2), (19.977608008, 16.5), (22.113804004, 12.8), (26.386195996, 12.8), (28.522391992, 16.5), align=None)
    extrude(amount=-CUT_EXTRUDE5_DEPTH, mode=Mode.SUBTRACT)

    # Fillet2
    fillet2_edges = [part.edges().sort_by_distance(p)[0] for p in [
        (-65, 0, -29.398849639),
    ]]
    fillet(fillet2_edges, radius=FILLET2_R)


solid = part.part
